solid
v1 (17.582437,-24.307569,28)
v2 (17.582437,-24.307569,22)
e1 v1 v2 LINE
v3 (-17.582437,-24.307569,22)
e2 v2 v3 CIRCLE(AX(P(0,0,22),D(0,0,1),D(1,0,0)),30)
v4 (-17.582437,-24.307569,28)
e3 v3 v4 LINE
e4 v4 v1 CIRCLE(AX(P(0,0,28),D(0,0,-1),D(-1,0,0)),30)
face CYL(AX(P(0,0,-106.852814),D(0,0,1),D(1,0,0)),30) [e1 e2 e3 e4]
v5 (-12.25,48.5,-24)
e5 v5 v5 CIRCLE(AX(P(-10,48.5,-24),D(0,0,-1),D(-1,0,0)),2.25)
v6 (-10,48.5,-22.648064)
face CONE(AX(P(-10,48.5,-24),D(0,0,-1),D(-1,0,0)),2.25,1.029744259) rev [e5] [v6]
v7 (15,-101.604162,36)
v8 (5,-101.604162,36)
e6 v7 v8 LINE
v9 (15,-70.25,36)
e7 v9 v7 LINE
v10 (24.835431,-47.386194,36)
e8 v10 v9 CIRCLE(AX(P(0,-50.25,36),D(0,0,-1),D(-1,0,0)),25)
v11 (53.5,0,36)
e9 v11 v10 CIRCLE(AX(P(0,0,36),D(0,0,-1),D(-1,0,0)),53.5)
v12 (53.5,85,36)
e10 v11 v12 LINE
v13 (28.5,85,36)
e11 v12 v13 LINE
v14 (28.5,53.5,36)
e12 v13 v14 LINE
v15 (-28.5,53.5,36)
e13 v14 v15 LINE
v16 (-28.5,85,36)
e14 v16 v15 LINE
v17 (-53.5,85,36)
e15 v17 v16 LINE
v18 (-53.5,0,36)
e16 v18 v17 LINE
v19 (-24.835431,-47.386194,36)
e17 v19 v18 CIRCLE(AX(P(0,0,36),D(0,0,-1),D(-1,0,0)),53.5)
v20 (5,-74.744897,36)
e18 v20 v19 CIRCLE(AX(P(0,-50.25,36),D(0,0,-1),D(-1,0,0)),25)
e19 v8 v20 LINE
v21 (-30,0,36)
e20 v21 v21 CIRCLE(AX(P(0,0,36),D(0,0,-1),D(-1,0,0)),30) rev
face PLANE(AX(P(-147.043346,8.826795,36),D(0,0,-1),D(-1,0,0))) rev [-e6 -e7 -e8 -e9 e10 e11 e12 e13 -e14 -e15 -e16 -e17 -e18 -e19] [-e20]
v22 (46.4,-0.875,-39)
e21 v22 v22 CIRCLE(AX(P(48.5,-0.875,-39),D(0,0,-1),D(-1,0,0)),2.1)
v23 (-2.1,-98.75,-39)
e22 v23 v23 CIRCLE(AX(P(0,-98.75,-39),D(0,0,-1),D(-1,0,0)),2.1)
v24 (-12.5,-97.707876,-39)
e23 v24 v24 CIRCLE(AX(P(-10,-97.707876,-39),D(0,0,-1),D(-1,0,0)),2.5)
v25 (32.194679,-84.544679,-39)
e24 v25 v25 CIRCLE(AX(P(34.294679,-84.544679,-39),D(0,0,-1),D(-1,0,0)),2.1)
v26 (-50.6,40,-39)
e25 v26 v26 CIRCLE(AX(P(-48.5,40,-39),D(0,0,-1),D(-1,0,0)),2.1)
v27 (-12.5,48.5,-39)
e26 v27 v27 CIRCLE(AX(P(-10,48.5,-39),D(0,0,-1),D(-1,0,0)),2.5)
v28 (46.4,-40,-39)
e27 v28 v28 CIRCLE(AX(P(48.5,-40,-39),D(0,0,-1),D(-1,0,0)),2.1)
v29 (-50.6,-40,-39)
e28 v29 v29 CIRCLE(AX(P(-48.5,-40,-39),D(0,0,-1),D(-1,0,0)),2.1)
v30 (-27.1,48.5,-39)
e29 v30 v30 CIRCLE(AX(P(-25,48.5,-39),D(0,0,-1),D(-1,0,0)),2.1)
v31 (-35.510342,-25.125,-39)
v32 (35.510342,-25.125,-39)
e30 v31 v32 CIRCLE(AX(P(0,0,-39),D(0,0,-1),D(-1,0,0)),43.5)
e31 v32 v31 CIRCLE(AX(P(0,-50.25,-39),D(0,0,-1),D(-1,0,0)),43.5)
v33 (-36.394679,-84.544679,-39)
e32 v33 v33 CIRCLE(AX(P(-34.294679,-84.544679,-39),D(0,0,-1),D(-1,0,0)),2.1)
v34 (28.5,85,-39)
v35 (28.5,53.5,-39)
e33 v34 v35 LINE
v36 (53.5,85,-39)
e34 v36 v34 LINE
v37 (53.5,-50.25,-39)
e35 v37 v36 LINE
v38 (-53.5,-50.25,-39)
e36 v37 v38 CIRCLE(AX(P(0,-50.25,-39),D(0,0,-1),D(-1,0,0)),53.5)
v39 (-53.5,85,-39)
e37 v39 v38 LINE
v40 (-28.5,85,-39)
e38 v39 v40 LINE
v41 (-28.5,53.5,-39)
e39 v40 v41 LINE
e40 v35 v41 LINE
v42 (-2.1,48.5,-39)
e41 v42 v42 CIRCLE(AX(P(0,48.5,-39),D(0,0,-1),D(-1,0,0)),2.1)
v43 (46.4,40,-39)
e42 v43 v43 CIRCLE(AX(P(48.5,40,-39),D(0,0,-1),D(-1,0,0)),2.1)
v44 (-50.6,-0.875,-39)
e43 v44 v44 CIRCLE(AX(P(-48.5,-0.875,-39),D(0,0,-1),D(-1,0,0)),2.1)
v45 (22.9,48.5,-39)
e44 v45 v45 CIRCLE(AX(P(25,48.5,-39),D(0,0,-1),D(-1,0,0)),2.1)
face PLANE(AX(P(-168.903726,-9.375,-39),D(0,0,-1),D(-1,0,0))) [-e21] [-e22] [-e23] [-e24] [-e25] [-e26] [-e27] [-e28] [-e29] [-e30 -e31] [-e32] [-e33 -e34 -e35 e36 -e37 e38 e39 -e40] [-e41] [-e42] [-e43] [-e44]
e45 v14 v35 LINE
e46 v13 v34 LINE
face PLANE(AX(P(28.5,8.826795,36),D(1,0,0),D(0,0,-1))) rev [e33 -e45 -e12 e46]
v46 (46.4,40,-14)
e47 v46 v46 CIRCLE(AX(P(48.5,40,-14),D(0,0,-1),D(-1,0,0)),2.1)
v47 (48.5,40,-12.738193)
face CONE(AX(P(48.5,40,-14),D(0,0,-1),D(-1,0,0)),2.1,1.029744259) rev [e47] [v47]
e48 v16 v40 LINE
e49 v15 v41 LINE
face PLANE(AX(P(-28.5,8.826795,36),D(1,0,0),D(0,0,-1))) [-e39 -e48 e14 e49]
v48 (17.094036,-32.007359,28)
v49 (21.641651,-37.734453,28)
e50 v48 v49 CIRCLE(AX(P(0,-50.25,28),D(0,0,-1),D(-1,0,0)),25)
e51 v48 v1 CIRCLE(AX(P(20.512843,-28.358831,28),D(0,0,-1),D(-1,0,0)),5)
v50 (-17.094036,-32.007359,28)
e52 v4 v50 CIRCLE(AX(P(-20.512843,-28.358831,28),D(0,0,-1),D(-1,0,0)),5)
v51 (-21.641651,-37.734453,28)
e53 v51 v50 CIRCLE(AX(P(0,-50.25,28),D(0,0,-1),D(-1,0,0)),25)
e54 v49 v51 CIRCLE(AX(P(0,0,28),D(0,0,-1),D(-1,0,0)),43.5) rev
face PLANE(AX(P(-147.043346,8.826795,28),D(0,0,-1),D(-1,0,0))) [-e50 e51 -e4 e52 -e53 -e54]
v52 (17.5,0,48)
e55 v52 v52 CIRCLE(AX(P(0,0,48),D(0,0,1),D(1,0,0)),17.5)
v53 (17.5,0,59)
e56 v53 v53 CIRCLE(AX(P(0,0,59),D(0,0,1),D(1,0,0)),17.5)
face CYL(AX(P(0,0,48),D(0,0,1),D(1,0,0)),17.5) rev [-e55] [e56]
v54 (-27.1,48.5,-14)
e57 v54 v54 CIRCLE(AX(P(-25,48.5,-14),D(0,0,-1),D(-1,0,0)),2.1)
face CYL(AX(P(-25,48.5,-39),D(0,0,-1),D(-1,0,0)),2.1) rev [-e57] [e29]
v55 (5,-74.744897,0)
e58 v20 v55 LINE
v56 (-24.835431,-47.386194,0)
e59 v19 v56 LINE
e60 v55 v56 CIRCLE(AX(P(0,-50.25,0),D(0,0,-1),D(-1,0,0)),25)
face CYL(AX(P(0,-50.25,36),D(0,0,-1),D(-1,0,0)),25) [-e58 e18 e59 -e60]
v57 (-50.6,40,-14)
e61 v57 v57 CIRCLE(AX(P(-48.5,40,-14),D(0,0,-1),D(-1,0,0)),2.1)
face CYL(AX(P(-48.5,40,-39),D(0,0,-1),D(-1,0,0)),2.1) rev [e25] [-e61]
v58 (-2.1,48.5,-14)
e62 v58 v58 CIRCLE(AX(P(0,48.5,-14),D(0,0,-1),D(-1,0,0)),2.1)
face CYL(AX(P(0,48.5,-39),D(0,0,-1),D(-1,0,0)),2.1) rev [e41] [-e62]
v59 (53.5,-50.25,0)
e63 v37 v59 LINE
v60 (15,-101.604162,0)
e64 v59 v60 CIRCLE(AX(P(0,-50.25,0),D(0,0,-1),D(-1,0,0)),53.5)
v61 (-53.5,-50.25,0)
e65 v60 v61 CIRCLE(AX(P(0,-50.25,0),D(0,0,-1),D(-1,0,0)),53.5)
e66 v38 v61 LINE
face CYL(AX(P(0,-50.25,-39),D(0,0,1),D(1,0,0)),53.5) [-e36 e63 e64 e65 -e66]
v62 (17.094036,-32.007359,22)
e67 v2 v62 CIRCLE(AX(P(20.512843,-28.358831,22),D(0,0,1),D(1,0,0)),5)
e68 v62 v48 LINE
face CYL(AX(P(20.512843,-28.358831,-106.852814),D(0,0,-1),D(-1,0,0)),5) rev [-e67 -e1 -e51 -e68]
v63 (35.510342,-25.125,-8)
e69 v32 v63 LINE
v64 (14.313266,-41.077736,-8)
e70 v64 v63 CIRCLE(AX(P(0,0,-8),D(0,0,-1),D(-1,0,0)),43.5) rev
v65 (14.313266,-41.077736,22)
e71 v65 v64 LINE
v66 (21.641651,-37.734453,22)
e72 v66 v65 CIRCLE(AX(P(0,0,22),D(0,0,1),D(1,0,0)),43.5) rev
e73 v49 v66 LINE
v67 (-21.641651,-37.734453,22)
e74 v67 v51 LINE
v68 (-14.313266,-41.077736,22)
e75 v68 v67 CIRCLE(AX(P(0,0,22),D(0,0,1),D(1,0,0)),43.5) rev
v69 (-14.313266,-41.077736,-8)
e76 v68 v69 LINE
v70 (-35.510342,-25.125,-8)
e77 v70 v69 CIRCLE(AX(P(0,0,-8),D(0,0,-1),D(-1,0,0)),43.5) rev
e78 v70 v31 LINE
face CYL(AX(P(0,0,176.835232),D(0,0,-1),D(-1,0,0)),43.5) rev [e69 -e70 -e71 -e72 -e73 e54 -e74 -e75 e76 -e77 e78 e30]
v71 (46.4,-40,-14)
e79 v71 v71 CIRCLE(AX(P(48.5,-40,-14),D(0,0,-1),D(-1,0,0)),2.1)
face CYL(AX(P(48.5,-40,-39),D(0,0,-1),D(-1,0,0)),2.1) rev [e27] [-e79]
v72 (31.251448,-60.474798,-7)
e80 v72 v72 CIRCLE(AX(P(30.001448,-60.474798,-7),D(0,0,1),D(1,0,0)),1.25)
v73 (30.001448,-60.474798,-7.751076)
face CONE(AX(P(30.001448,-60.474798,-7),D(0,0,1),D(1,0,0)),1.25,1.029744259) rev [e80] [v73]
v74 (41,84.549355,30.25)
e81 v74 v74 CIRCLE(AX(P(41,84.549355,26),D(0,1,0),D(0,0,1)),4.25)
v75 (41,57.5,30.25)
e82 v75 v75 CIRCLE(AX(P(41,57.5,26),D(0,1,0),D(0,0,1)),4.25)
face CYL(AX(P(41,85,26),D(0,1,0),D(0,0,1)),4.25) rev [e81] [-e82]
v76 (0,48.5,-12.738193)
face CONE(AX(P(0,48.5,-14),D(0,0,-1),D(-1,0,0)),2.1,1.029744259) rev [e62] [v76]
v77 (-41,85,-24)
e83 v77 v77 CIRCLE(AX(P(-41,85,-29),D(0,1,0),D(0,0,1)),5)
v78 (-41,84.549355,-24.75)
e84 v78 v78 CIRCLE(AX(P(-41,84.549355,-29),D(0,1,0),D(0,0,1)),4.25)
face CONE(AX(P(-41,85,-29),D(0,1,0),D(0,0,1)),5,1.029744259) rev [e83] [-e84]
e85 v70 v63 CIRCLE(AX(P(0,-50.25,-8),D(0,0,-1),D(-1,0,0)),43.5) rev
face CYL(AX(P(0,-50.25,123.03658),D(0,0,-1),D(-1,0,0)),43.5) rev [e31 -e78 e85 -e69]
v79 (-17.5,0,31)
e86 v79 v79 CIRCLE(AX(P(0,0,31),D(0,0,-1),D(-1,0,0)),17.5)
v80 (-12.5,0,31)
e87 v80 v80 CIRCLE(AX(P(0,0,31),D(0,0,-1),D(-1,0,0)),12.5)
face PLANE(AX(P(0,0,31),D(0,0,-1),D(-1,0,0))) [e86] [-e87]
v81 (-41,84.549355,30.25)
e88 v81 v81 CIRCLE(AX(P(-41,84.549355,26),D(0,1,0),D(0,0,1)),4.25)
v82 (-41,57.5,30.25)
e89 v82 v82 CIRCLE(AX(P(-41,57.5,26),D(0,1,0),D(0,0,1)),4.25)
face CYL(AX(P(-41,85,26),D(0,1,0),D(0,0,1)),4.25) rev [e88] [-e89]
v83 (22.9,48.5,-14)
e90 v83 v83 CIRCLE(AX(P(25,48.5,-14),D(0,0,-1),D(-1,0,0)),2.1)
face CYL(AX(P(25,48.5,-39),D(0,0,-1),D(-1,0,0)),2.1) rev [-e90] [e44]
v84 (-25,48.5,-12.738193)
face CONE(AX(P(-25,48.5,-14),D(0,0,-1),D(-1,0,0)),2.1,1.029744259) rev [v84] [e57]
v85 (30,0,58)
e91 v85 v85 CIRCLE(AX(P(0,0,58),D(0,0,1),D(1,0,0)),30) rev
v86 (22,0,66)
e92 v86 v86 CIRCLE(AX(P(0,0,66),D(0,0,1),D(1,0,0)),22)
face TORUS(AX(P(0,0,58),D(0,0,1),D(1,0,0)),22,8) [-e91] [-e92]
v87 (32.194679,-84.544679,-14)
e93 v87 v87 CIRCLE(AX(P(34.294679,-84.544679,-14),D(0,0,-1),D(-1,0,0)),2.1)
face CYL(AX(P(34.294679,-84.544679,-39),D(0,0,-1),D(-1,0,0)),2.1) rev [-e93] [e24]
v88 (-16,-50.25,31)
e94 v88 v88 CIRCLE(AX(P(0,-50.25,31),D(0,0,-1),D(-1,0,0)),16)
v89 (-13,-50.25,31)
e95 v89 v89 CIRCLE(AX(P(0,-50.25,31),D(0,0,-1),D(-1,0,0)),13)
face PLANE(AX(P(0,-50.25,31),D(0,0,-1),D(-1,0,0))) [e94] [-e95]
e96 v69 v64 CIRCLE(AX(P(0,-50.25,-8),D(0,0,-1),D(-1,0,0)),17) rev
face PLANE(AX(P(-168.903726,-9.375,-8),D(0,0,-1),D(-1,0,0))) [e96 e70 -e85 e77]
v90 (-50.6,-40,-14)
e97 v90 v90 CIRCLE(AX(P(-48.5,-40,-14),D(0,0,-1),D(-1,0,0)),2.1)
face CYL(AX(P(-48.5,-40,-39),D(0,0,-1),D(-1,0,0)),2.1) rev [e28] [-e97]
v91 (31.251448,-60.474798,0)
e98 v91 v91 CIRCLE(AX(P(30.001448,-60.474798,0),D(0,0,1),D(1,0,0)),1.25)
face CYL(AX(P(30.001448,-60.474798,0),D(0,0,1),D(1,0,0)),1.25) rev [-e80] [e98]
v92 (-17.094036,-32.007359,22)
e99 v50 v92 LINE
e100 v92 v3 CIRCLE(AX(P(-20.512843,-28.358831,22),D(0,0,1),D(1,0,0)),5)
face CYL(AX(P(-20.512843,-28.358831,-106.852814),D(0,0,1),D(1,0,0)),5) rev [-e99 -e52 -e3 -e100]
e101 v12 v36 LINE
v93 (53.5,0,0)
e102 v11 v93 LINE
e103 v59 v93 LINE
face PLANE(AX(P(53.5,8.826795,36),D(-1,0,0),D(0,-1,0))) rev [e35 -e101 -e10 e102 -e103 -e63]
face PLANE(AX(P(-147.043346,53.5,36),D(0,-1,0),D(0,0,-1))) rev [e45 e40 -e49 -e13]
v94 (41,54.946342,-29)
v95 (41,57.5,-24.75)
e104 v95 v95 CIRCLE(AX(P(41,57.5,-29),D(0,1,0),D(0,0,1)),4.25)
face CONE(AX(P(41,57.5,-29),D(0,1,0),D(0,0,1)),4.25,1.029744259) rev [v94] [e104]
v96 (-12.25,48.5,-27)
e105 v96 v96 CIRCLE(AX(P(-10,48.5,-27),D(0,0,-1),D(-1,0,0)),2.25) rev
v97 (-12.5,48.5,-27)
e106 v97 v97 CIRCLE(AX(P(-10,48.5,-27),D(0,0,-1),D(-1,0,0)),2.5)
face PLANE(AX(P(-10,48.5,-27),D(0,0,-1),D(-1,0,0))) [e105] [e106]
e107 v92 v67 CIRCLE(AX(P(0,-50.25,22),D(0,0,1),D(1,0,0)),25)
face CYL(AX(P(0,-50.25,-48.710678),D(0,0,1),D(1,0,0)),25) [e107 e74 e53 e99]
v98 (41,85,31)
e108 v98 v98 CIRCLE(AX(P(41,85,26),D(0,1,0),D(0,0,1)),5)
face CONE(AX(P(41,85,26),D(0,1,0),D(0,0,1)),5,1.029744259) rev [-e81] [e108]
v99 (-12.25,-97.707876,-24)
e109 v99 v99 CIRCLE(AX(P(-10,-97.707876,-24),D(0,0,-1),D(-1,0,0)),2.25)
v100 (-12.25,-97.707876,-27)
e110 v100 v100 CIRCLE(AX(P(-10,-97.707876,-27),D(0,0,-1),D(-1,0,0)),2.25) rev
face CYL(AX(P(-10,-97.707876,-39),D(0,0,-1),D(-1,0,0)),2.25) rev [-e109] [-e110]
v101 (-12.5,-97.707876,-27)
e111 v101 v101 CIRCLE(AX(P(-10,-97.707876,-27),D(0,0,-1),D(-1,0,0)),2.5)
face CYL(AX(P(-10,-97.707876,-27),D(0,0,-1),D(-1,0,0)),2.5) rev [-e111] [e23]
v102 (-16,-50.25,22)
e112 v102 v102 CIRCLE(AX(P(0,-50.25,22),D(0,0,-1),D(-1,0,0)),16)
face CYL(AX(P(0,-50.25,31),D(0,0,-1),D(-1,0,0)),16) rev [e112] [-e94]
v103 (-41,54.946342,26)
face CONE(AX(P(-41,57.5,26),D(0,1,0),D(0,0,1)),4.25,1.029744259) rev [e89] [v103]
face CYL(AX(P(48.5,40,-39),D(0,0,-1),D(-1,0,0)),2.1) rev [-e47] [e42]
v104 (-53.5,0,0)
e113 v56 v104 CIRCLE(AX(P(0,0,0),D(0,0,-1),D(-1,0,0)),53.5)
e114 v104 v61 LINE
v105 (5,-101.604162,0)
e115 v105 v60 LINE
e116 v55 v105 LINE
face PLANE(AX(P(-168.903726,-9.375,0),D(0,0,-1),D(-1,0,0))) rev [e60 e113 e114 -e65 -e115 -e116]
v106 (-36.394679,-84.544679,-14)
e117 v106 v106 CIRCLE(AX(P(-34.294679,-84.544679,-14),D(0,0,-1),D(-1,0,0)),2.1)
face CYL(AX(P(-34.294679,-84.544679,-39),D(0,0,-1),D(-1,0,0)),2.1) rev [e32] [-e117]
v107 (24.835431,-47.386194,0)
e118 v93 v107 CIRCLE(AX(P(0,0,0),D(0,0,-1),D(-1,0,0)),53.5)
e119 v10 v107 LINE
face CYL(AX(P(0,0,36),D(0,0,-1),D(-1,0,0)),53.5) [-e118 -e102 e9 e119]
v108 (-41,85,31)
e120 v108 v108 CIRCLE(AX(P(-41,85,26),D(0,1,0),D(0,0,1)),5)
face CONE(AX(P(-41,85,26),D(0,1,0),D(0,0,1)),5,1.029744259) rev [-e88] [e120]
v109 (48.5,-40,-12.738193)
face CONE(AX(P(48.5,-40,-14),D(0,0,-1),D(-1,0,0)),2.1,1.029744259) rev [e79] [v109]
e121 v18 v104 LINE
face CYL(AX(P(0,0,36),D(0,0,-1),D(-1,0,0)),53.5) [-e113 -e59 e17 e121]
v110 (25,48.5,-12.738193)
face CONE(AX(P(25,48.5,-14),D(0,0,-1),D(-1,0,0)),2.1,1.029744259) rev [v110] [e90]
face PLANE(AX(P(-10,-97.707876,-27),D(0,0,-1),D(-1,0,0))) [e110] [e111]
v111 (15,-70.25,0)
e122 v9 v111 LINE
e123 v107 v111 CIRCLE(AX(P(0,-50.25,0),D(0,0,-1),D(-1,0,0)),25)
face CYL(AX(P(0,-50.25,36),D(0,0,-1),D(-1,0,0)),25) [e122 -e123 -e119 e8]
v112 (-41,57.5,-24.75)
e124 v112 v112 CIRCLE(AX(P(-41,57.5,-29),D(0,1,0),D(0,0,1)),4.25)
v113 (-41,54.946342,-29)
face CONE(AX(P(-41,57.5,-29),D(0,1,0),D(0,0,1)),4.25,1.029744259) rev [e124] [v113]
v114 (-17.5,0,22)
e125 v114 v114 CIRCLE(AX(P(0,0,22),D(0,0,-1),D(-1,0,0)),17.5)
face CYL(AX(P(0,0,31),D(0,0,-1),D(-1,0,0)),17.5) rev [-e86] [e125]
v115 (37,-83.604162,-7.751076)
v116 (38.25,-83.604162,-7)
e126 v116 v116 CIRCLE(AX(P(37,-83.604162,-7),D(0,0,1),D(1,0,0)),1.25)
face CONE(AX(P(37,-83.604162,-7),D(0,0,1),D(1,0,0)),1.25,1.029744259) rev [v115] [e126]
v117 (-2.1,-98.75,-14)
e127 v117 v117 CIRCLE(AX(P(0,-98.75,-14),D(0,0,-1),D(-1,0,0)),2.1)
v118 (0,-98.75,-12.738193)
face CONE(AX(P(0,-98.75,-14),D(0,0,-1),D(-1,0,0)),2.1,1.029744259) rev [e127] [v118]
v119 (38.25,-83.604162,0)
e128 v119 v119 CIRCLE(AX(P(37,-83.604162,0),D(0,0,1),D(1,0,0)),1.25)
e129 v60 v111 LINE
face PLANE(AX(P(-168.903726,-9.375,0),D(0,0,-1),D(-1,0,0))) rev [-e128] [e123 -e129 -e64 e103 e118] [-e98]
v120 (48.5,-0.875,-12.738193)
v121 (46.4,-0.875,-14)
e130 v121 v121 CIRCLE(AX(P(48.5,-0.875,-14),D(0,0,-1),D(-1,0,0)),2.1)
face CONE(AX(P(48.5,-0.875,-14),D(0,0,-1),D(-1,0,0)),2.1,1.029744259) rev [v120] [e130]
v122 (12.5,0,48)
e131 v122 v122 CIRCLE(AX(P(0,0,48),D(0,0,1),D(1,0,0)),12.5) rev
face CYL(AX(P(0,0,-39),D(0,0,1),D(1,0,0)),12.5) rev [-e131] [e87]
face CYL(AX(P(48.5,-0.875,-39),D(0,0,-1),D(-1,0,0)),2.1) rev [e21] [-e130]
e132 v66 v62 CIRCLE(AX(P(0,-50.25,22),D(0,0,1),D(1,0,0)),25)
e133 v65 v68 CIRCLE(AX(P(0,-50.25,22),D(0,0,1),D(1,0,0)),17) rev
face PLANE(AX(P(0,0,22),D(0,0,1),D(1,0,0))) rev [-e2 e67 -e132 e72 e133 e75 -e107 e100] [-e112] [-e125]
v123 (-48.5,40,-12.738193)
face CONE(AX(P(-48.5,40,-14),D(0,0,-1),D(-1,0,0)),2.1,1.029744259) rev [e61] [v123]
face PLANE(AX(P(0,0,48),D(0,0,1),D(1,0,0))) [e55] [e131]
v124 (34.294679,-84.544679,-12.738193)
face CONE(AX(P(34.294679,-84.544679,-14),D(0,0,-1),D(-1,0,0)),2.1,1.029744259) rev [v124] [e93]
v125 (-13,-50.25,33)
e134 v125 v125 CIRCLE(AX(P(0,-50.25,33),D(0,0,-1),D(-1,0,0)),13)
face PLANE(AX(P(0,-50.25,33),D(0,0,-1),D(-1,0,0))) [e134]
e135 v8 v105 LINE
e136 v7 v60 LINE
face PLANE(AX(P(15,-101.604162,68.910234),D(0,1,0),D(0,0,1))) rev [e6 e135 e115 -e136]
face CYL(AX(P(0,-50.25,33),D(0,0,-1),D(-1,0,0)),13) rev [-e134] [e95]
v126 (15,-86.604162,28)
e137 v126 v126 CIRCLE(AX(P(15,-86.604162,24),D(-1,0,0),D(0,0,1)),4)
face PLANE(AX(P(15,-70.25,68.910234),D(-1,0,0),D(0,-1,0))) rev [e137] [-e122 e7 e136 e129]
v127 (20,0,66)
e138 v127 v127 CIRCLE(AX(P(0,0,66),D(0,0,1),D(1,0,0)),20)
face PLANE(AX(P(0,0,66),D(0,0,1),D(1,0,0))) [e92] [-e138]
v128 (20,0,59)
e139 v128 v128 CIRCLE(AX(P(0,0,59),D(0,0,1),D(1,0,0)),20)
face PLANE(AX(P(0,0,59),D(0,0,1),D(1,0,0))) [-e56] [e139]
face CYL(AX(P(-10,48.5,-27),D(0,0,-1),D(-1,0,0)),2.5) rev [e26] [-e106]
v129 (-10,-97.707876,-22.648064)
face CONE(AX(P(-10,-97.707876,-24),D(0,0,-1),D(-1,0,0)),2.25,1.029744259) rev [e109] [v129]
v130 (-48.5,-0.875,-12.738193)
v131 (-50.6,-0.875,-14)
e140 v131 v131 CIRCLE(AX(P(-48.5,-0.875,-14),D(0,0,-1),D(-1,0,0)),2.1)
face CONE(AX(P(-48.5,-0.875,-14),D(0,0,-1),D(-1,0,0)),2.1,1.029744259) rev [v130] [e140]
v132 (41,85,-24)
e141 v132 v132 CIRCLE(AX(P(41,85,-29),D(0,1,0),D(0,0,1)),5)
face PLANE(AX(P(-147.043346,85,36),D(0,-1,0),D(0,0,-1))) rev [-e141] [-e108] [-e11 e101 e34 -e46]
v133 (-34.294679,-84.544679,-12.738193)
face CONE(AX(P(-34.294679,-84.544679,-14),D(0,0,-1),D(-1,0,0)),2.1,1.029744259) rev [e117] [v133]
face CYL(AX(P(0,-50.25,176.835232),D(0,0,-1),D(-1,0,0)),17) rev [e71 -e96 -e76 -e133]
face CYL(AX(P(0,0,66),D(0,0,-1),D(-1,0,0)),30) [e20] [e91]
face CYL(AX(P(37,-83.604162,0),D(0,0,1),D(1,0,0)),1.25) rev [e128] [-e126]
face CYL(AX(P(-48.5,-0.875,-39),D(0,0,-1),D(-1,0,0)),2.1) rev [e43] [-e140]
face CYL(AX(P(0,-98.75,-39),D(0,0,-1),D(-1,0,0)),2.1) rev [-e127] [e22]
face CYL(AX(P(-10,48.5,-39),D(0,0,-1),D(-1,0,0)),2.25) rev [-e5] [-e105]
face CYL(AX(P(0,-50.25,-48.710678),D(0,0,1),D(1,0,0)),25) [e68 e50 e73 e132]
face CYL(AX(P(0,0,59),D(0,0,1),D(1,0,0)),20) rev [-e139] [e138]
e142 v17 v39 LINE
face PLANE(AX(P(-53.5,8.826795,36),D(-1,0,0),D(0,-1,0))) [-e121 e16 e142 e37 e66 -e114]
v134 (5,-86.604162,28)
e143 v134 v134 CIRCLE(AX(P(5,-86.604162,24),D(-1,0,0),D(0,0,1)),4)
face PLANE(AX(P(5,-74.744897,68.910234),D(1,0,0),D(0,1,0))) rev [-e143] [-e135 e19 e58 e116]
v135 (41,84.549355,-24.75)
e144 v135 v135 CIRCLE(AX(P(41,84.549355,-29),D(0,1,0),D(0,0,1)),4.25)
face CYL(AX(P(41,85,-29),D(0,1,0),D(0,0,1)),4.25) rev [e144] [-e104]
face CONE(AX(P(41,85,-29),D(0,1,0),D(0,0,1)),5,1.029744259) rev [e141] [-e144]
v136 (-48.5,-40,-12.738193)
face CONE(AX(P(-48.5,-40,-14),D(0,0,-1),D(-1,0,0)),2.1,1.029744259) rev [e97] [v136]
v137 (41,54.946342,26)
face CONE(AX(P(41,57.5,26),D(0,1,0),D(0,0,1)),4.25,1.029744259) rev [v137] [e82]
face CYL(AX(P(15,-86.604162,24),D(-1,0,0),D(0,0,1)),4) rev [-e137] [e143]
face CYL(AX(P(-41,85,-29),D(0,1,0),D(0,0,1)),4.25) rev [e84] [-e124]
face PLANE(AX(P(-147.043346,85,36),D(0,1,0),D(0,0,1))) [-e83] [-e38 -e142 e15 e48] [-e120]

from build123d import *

# Parameters (mm, degrees)
EXTRUS_O1_DEPTH                      = 36
ESBO_O2_R                            = 30
EXTRUS_O3_DEPTH                      = 30
EXTRUS_O4_START                      = 39
EXTRUS_O4_DEPTH                      = 39
ESBO_O4_R                            = 20
CORTE_EXTRUS_O1_DEPTH                = 7
CORTE_EXTRUS_O3_DEPTH                = 67
ESBO_O7_R                            = 43.5
CORTE_EXTRUS_O4_DEPTH                = 31
EXTRUS_O5_START                      = 6
ESBO_O8_R                            = 30
EXTRUS_O5_DEPTH                      = 6
EXTRUS_O6_START                      = 6
ESBO_O9_R                            = 25
EXTRUS_O6_DEPTH                      = 6
ESBO_O10_R                           = 17.5
CORTE_EXTRUS_O5_DEPTH                = 9
ESBO_O5_R                            = 12.5
CORTE_EXTRUS_O2_DEPTH                = 153.414935292
ESBO_O11_R                           = 16
CORTE_EXTRUS_O6_DEPTH                = 9
ESBO_O12_R                           = 13
CORTE_EXTRUS_O7_DEPTH                = 2
CORTE_EXTRUS_O8_START                = -11
ESBO_O13_R                           = 17.5
CORTE_EXTRUS_O8_DEPTH                = 11
FILETE1_R                            = 5
FILETE2_R                            = 8
FURO_DE_DI_METRO_4_5_4_5_1_D         = 4.5
FURO_DE_DI_METRO_4_5_4_5_1_DEPTH     = 15
FURO_DE_DI_METRO_4_5_4_5_1_TIP       = 1.351936393
ESBO_O18_R                           = 2.5
CORTE_EXTRUS_O9_DEPTH                = 12
FURO_ROSCADO_DE_M10X1_51_D           = 8.5
FURO_ROSCADO_DE_M10X1_51_DEPTH       = 27.5
FURO_ROSCADO_DE_M10X1_51_CSINK_D     = 10
FURO_ROSCADO_DE_M10X1_51_CSINK_ANGLE = 118
FURO_ROSCADO_DE_M10X1_51_TIP         = 2.553657631
EXTRUS_O8_DEPTH                      = 36
ESBO_O24_R                           = 4
CORTE_EXTRUS_O12_DEPTH               = 10
FURO_ROSCADO_DE_M3X0_51_D            = 2.5
FURO_ROSCADO_DE_M3X0_51_DEPTH        = 7
FURO_ROSCADO_DE_M3X0_51_TIP          = 0.751075774


# Read off the part's stored shape, not the designer's step: Esboço-padrão1
with BuildPart() as part:
    # Esboço1 → Extrusão1 (new body)
    with BuildSketch(Plane.XY):
        with BuildLine():
            Line((-28.5, 53.5), (-28.5, 85))
            Line((-28.5, 85), (-53.5, 85))
            Line((-53.5, 85), (-53.5, 0))
            ThreePointArc((-53.5, 0), (-45.776334167, -27.690742681), (-24.835430646, -47.38619403))
            ThreePointArc((-24.835430646, -47.38619403), (0, -75.25), (24.835430646, -47.38619403))
            ThreePointArc((24.835430646, -47.38619403), (45.776334167, -27.690742681), (53.5, 0))
            Line((53.5, 0), (53.5, 85))
            Line((53.5, 85), (28.5, 85))
            Line((28.5, 85), (28.5, 53.5))
            Line((28.5, 53.5), (-28.5, 53.5))
        make_face()
    extrude(amount=EXTRUS_O1_DEPTH)

    # Esboço2 → Extrusão3 (add)
    with BuildSketch(Plane.XY.offset(36)):
        with Locations(Location((0, 0, 0), (0, 0, 180))):
            Circle(ESBO_O2_R)
    extrude(amount=EXTRUS_O3_DEPTH)

    # Esboço3 → Extrusão4 (add)
    with BuildSketch(Plane(origin=(0, 0, 0), x_dir=(-1, 0, 0), z_dir=(0, 0, -1)).offset(EXTRUS_O4_START)):
        with BuildLine():
            ThreePointArc((47.233297312, -25.125), (51.90968795, -12.947366408), (53.5, 0))
            ThreePointArc((53.5, 0), (37.83021276, 37.830212827), (-9.4e-08, 53.5))
            ThreePointArc((-9.4e-08, 53.5), (-37.830212827, 37.83021276), (-53.5, 0))
            ThreePointArc((-53.5, 0), (-51.90968795, -12.947366408), (-47.233297312, -25.125))
            ThreePointArc((-47.233297312, -25.125), (0, 3.25), (47.233297312, -25.125))
        make_face()
        with BuildLine():
            ThreePointArc((24.835430646, -47.38619403), (37.714262253, -37.945809027), (47.233297312, -25.125))
            ThreePointArc((47.233297312, -25.125), (0, 3.25), (-47.233297312, -25.125))
            ThreePointArc((-47.233297312, -25.125), (-37.714262253, -37.945809027), (-24.835430646, -47.38619403))
            ThreePointArc((-24.835430646, -47.38619403), (0, -53.5), (24.835430646, -47.38619403))
        make_face()
        with BuildLine():
            Line((-53.5, 0), (-53.5, -50.25))
            ThreePointArc((-53.5, -50.25), (-51.90968795, -37.302633592), (-47.233297312, -25.125))
            ThreePointArc((-47.233297312, -25.125), (-51.90968795, -12.947366408), (-53.5, 0))
        make_face()
        with BuildLine():
            Line((53.5, -50.25), (53.5, 0))
            ThreePointArc((53.5, 0), (51.90968795, -12.947366408), (47.233297312, -25.125))
            ThreePointArc((47.233297312, -25.125), (51.90968795, -37.302633592), (53.5, -50.25))
        make_face()
        with BuildLine():
            ThreePointArc((-53.5, -50.25), (0, -103.75), (53.5, -50.25))
            ThreePointArc((53.5, -50.25), (51.90968795, -37.302633592), (47.233297312, -25.125))
            ThreePointArc((47.233297312, -25.125), (37.714262253, -37.945809027), (24.835430646, -47.38619403))
            ThreePointArc((24.835430646, -47.38619403), (0, -75.25), (-24.835430646, -47.38619403))
            ThreePointArc((-24.835430646, -47.38619403), (-37.714262253, -37.945809027), (-47.233297312, -25.125))
            ThreePointArc((-47.233297312, -25.125), (-51.90968795, -37.302633592), (-53.5, -50.25))
        make_face()
        with BuildLine():
            ThreePointArc((-24.835430646, -47.38619403), (0, -75.25), (24.835430646, -47.38619403))
            ThreePointArc((24.835430646, -47.38619403), (0, -53.5), (-24.835430646, -47.38619403))
        make_face()
        with BuildLine():
            ThreePointArc((-53.5, 0), (-37.830212827, 37.83021276), (-9.4e-08, 53.5))
            Line((-9.4e-08, 53.5), (-28.5, 53.5))
            Line((-28.5, 53.5), (-28.5, 85))
            Line((-28.5, 85), (-53.5, 85))
            Line((-53.5, 85), (-53.5, 0))
        make_face()
        with BuildLine():
            ThreePointArc((-9.4e-08, 53.5), (37.83021276, 37.830212827), (53.5, 0))
            Line((53.5, 0), (53.5, 85))
            Line((53.5, 85), (28.5, 85))
            Line((28.5, 85), (28.5, 53.5))
            Line((28.5, 53.5), (-9.4e-08, 53.5))
        make_face()
    extrude(amount=-EXTRUS_O4_DEPTH)

    # Esboço4 → Corte-extrusão1 (cut)
    with BuildSketch(Plane.XY.offset(66)):
        Circle(ESBO_O4_R)
    extrude(amount=-CORTE_EXTRUS_O1_DEPTH, mode=Mode.SUBTRACT)

    # Esboço6 → Corte-extrusão3 (cut)
    with BuildSketch(Plane(origin=(0, 0, -39), x_dir=(-1, 0, 0), z_dir=(0, 0, -1))):
        with BuildLine():
            ThreePointArc((14.313265838, -41.077736318), (0, 43.5), (-14.313265838, -41.077736318))
            ThreePointArc((-14.313265838, -41.077736318), (0, -67.25), (14.313265838, -41.077736318))
        make_face()
    extrude(amount=-CORTE_EXTRUS_O3_DEPTH, mode=Mode.SUBTRACT)

    # Esboço7 → Corte-extrusão4 (cut)
    with BuildSketch(Plane(origin=(0, 0, -39), x_dir=(-1, 0, 0), z_dir=(0, 0, -1))):
        with Locations((0, -50.25)):
            Circle(ESBO_O7_R)
    extrude(amount=-CORTE_EXTRUS_O4_DEPTH, mode=Mode.SUBTRACT)

    # Esboço8 → Extrusão5 (add)
    with BuildSketch(Plane(origin=(0, 0, 28), x_dir=(-1, 0, 0), z_dir=(0, 0, -1)).offset(EXTRUS_O5_START)):
        Circle(ESBO_O8_R)
    extrude(amount=-EXTRUS_O5_DEPTH)

    # Esboço9 → Extrusão6 (add)
    with BuildSketch(Plane(origin=(0, 0, 28), x_dir=(-1, 0, 0), z_dir=(0, 0, -1)).offset(EXTRUS_O6_START)):
        with Locations((0, -50.25)):
            Circle(ESBO_O9_R)
    extrude(amount=-EXTRUS_O6_DEPTH)

    # Esboço10 → Corte-extrusão5 (cut)
    with BuildSketch(Plane(origin=(0, 0, 22), x_dir=(-1, 0, 0), z_dir=(0, 0, -1))):
        Circle(ESBO_O10_R)
    extrude(amount=-CORTE_EXTRUS_O5_DEPTH, mode=Mode.SUBTRACT)

    # Esboço5 → Corte-extrusão2 (cut, through all)
    with BuildSketch(Plane.XY.offset(59)):
        Circle(ESBO_O5_R)
    extrude(amount=-CORTE_EXTRUS_O2_DEPTH, mode=Mode.SUBTRACT)

    # Esboço11 → Corte-extrusão6 (cut)
    with BuildSketch(Plane(origin=(0, 0, 22), x_dir=(-1, 0, 0), z_dir=(0, 0, -1))):
        with Locations((0, -50.25)):
            Circle(ESBO_O11_R)
    extrude(amount=-CORTE_EXTRUS_O6_DEPTH, mode=Mode.SUBTRACT)

    # Esboço12 → Corte-extrusão7 (cut)
    with BuildSketch(Plane(origin=(0, 0, 31), x_dir=(-1, 0, 0), z_dir=(0, 0, -1))):
        with Locations((0, -50.25)):
            Circle(ESBO_O12_R)
    extrude(amount=-CORTE_EXTRUS_O7_DEPTH, mode=Mode.SUBTRACT)

    # Esboço13 → Corte-extrusão8 (cut)
    with BuildSketch(Plane.XY.offset(59).offset(CORTE_EXTRUS_O8_START)):
        with Locations(Location((0, 0, 0), (0, 0, 180))):
            Circle(ESBO_O13_R)
    extrude(amount=CORTE_EXTRUS_O8_DEPTH, mode=Mode.SUBTRACT)

    # Filete1
    filete1_edges = [part.edges().sort_by_distance(p)[0] for p in [
        (-11.124160039, -27.861318408, 25),
        (11.124160039, -27.861318408, 25),
    ]]
    fillet(filete1_edges, radius=FILETE1_R)

    # Filete2
    filete2_edges = [part.edges().sort_by_distance(p)[0] for p in [
        (30, 0, 66),
    ]]
    fillet(filete2_edges, radius=FILETE2_R)

    # Esboço15 → Furo roscado de M5x0.81 (revolve, cut)
    with BuildSketch(Plane(origin=(0, 48.5, -39), x_dir=(0, 1, 0), z_dir=(1, 0, 0))):
        Polygon((0, 0), (0, 26.2618073), (2.1, 25), (2.1, 0), align=None)
    revolve(axis=Axis((0, 48.5, -45.35), (0, 0, 1)), mode=Mode.SUBTRACT)

    # Esboço-padrão1 outline → Esboço-padrão1 (revolve, cut)
    with BuildSketch(Plane(origin=(-25, 48.5, 0), x_dir=(1, 0, 0), z_dir=(0, -1, 0))):
        Polygon((2.1, -39), (2.1, -14), (0, -12.7381927), (0, -39), align=None)
    revolve(axis=Axis((-25, 48.5, 0), (0, 0, 1)), mode=Mode.SUBTRACT)

    # Esbo_o-padr_o1 2 outline → Esbo_o-padr_o1 2 (revolve, cut)
    with BuildSketch(Plane(origin=(-48.5, 40, 0), x_dir=(1, 0, 0), z_dir=(0, -1, 0))):
        Polygon((2.1, -39), (2.1, -14), (0, -12.7381927), (0, -39), align=None)
    revolve(axis=Axis((-48.5, 40, 0), (0, 0, 1)), mode=Mode.SUBTRACT)

    # Esbo_o-padr_o1 3 outline → Esbo_o-padr_o1 3 (revolve, cut)
    with BuildSketch(Plane(origin=(-48.5, -40, 0), x_dir=(1, 0, 0), z_dir=(0, -1, 0))):
        Polygon((2.1, -39), (2.1, -14), (0, -12.7381927), (0, -39), align=None)
    revolve(axis=Axis((-48.5, -40, 0), (0, 0, 1)), mode=Mode.SUBTRACT)

    # Esbo_o-padr_o1 4 outline → Esbo_o-padr_o1 4 (revolve, cut)
    with BuildSketch(Plane(origin=(-34.294678888, -84.544678888, 0), x_dir=(1, 0, 0), z_dir=(0, -1, 0))):
        Polygon((2.1, -39), (2.1, -14), (0, -12.7381927), (0, -39), align=None)
    revolve(axis=Axis((-34.294678888, -84.544678888, 0), (0, 0, 1)), mode=Mode.SUBTRACT)

    # Esbo_o-padr_o1 5 outline → Esbo_o-padr_o1 5 (revolve, cut)
    with BuildSketch(Plane.XZ.offset(98.75)):
        Polygon((2.1, -39), (2.1, -14), (0, -12.7381927), (0, -39), align=None)
    revolve(axis=Axis((0, -98.75, 0), (0, 0, 1)), mode=Mode.SUBTRACT)

    # Esbo_o-padr_o1 6 outline → Esbo_o-padr_o1 6 (revolve, cut)
    with BuildSketch(Plane(origin=(34.294678888, -84.544678888, 0), x_dir=(1, 0, 0), z_dir=(0, -1, 0))):
        Polygon((2.1, -39), (2.1, -14), (0, -12.7381927), (0, -39), align=None)
    revolve(axis=Axis((34.294678888, -84.544678888, 0), (0, 0, 1)), mode=Mode.SUBTRACT)

    # Esbo_o-padr_o1 7 outline → Esbo_o-padr_o1 7 (revolve, cut)
    with BuildSketch(Plane(origin=(48.5, -40, 0), x_dir=(1, 0, 0), z_dir=(0, -1, 0))):
        Polygon((2.1, -39), (2.1, -14), (0, -12.7381927), (0, -39), align=None)
    revolve(axis=Axis((48.5, -40, 0), (0, 0, 1)), mode=Mode.SUBTRACT)

    # Esbo_o-padr_o1 8 outline → Esbo_o-padr_o1 8 (revolve, cut)
    with BuildSketch(Plane(origin=(48.5, 40, 0), x_dir=(1, 0, 0), z_dir=(0, -1, 0))):
        Polygon((2.1, -39), (2.1, -14), (0, -12.7381927), (0, -39), align=None)
    revolve(axis=Axis((48.5, 40, 0), (0, 0, 1)), mode=Mode.SUBTRACT)

    # Esbo_o-padr_o1 9 outline → Esbo_o-padr_o1 9 (revolve, cut)
    with BuildSketch(Plane(origin=(25, 48.5, 0), x_dir=(1, 0, 0), z_dir=(0, -1, 0))):
        Polygon((2.1, -39), (2.1, -14), (0, -12.7381927), (0, -39), align=None)
    revolve(axis=Axis((25, 48.5, 0), (0, 0, 1)), mode=Mode.SUBTRACT)

    # Esbo_o-padr_o1 10 outline → Esbo_o-padr_o1 10 (revolve, cut)
    with BuildSketch(Plane(origin=(-48.5, -0.875, 0), x_dir=(1, 0, 0), z_dir=(0, -1, 0))):
        Polygon((2.1, -39), (2.1, -14), (0, -12.7381927), (0, -39), align=None)
    revolve(axis=Axis((-48.5, -0.875, 0), (0, 0, 1)), mode=Mode.SUBTRACT)

    # Esbo_o-padr_o1 11 outline → Esbo_o-padr_o1 11 (revolve, cut)
    with BuildSketch(Plane(origin=(48.5, -0.875, 0), x_dir=(1, 0, 0), z_dir=(0, -1, 0))):
        Polygon((2.1, -39), (2.1, -14), (0, -12.7381927), (0, -39), align=None)
    revolve(axis=Axis((48.5, -0.875, 0), (0, 0, 1)), mode=Mode.SUBTRACT)

    # Furo de diâmetro Ø4.5 (4.5)1
    with Locations(Plane(origin=(-10, 48.5, -39), x_dir=(-1, 0, 0), z_dir=(0, 0, -1))):
        with Locations((0, 0), (0, -146.207876059)):
            Hole(FURO_DE_DI_METRO_4_5_4_5_1_D / 2, depth=FURO_DE_DI_METRO_4_5_4_5_1_DEPTH)
            with Locations((0, 0, -(FURO_DE_DI_METRO_4_5_4_5_1_DEPTH + FURO_DE_DI_METRO_4_5_4_5_1_TIP / 2))):  # 118° drill point
                Cone(0, FURO_DE_DI_METRO_4_5_4_5_1_D / 2, FURO_DE_DI_METRO_4_5_4_5_1_TIP, mode=Mode.SUBTRACT)

    # Esboço18 → Corte-extrusão9 (cut)
    with BuildSketch(Plane(origin=(0, 0, -39), x_dir=(-1, 0, 0), z_dir=(0, 0, -1))):
        with Locations((10, 48.5)):
            Circle(ESBO_O18_R)
        with Locations((10, -97.707876059)):
            Circle(ESBO_O18_R)
    extrude(amount=-CORTE_EXTRUS_O9_DEPTH, mode=Mode.SUBTRACT)

    # Furo roscado de M10x1.51
    with Locations(Plane(origin=(-41, 85, -29), x_dir=(0, 0, 1), z_dir=(0, 1, 0))):
        with Locations((0, 0), (0, 82), (55, 0), (55, 82)):
            CounterSinkHole(FURO_ROSCADO_DE_M10X1_51_D / 2, FURO_ROSCADO_DE_M10X1_51_CSINK_D / 2, depth=FURO_ROSCADO_DE_M10X1_51_DEPTH, counter_sink_angle=FURO_ROSCADO_DE_M10X1_51_CSINK_ANGLE)
            with Locations((0, 0, -(FURO_ROSCADO_DE_M10X1_51_DEPTH + FURO_ROSCADO_DE_M10X1_51_TIP / 2))):  # 118° drill point
                Cone(0, FURO_ROSCADO_DE_M10X1_51_D / 2, FURO_ROSCADO_DE_M10X1_51_TIP, mode=Mode.SUBTRACT)

    # Esboço23 → Extrusão8 (add)
    with BuildSketch(Plane.XY):
        with BuildLine():
            Line((5, -74.744897428), (5, -101.604162441))
            Line((5, -101.604162441), (15, -101.604162441))
            Line((15, -101.604162441), (15, -70.25))
            ThreePointArc((15, -70.25), (10.249440264, -73.052389662), (5, -74.744897428))
        make_face()
    extrude(amount=EXTRUS_O8_DEPTH)

    # Esboço24 → Corte-extrusão12 (cut)
    with BuildSketch(Plane.ZY.offset(-5)):
        with Locations((24, -86.604162441)):
            Circle(ESBO_O24_R)
    extrude(amount=-CORTE_EXTRUS_O12_DEPTH, mode=Mode.SUBTRACT)

    # Furo roscado de M3x0.51
    with Locations(Plane(origin=(37, -83.604162441, 0), x_dir=(1, 0, 0), z_dir=(0, 0, 1))):
        with Locations((0, 0), (-6.998551924, 23.129364366)):
            Hole(FURO_ROSCADO_DE_M3X0_51_D / 2, depth=FURO_ROSCADO_DE_M3X0_51_DEPTH)
            with Locations((0, 0, -(FURO_ROSCADO_DE_M3X0_51_DEPTH + FURO_ROSCADO_DE_M3X0_51_TIP / 2))):  # 118° drill point
                Cone(0, FURO_ROSCADO_DE_M3X0_51_D / 2, FURO_ROSCADO_DE_M3X0_51_TIP, mode=Mode.SUBTRACT)


solid = part.part
